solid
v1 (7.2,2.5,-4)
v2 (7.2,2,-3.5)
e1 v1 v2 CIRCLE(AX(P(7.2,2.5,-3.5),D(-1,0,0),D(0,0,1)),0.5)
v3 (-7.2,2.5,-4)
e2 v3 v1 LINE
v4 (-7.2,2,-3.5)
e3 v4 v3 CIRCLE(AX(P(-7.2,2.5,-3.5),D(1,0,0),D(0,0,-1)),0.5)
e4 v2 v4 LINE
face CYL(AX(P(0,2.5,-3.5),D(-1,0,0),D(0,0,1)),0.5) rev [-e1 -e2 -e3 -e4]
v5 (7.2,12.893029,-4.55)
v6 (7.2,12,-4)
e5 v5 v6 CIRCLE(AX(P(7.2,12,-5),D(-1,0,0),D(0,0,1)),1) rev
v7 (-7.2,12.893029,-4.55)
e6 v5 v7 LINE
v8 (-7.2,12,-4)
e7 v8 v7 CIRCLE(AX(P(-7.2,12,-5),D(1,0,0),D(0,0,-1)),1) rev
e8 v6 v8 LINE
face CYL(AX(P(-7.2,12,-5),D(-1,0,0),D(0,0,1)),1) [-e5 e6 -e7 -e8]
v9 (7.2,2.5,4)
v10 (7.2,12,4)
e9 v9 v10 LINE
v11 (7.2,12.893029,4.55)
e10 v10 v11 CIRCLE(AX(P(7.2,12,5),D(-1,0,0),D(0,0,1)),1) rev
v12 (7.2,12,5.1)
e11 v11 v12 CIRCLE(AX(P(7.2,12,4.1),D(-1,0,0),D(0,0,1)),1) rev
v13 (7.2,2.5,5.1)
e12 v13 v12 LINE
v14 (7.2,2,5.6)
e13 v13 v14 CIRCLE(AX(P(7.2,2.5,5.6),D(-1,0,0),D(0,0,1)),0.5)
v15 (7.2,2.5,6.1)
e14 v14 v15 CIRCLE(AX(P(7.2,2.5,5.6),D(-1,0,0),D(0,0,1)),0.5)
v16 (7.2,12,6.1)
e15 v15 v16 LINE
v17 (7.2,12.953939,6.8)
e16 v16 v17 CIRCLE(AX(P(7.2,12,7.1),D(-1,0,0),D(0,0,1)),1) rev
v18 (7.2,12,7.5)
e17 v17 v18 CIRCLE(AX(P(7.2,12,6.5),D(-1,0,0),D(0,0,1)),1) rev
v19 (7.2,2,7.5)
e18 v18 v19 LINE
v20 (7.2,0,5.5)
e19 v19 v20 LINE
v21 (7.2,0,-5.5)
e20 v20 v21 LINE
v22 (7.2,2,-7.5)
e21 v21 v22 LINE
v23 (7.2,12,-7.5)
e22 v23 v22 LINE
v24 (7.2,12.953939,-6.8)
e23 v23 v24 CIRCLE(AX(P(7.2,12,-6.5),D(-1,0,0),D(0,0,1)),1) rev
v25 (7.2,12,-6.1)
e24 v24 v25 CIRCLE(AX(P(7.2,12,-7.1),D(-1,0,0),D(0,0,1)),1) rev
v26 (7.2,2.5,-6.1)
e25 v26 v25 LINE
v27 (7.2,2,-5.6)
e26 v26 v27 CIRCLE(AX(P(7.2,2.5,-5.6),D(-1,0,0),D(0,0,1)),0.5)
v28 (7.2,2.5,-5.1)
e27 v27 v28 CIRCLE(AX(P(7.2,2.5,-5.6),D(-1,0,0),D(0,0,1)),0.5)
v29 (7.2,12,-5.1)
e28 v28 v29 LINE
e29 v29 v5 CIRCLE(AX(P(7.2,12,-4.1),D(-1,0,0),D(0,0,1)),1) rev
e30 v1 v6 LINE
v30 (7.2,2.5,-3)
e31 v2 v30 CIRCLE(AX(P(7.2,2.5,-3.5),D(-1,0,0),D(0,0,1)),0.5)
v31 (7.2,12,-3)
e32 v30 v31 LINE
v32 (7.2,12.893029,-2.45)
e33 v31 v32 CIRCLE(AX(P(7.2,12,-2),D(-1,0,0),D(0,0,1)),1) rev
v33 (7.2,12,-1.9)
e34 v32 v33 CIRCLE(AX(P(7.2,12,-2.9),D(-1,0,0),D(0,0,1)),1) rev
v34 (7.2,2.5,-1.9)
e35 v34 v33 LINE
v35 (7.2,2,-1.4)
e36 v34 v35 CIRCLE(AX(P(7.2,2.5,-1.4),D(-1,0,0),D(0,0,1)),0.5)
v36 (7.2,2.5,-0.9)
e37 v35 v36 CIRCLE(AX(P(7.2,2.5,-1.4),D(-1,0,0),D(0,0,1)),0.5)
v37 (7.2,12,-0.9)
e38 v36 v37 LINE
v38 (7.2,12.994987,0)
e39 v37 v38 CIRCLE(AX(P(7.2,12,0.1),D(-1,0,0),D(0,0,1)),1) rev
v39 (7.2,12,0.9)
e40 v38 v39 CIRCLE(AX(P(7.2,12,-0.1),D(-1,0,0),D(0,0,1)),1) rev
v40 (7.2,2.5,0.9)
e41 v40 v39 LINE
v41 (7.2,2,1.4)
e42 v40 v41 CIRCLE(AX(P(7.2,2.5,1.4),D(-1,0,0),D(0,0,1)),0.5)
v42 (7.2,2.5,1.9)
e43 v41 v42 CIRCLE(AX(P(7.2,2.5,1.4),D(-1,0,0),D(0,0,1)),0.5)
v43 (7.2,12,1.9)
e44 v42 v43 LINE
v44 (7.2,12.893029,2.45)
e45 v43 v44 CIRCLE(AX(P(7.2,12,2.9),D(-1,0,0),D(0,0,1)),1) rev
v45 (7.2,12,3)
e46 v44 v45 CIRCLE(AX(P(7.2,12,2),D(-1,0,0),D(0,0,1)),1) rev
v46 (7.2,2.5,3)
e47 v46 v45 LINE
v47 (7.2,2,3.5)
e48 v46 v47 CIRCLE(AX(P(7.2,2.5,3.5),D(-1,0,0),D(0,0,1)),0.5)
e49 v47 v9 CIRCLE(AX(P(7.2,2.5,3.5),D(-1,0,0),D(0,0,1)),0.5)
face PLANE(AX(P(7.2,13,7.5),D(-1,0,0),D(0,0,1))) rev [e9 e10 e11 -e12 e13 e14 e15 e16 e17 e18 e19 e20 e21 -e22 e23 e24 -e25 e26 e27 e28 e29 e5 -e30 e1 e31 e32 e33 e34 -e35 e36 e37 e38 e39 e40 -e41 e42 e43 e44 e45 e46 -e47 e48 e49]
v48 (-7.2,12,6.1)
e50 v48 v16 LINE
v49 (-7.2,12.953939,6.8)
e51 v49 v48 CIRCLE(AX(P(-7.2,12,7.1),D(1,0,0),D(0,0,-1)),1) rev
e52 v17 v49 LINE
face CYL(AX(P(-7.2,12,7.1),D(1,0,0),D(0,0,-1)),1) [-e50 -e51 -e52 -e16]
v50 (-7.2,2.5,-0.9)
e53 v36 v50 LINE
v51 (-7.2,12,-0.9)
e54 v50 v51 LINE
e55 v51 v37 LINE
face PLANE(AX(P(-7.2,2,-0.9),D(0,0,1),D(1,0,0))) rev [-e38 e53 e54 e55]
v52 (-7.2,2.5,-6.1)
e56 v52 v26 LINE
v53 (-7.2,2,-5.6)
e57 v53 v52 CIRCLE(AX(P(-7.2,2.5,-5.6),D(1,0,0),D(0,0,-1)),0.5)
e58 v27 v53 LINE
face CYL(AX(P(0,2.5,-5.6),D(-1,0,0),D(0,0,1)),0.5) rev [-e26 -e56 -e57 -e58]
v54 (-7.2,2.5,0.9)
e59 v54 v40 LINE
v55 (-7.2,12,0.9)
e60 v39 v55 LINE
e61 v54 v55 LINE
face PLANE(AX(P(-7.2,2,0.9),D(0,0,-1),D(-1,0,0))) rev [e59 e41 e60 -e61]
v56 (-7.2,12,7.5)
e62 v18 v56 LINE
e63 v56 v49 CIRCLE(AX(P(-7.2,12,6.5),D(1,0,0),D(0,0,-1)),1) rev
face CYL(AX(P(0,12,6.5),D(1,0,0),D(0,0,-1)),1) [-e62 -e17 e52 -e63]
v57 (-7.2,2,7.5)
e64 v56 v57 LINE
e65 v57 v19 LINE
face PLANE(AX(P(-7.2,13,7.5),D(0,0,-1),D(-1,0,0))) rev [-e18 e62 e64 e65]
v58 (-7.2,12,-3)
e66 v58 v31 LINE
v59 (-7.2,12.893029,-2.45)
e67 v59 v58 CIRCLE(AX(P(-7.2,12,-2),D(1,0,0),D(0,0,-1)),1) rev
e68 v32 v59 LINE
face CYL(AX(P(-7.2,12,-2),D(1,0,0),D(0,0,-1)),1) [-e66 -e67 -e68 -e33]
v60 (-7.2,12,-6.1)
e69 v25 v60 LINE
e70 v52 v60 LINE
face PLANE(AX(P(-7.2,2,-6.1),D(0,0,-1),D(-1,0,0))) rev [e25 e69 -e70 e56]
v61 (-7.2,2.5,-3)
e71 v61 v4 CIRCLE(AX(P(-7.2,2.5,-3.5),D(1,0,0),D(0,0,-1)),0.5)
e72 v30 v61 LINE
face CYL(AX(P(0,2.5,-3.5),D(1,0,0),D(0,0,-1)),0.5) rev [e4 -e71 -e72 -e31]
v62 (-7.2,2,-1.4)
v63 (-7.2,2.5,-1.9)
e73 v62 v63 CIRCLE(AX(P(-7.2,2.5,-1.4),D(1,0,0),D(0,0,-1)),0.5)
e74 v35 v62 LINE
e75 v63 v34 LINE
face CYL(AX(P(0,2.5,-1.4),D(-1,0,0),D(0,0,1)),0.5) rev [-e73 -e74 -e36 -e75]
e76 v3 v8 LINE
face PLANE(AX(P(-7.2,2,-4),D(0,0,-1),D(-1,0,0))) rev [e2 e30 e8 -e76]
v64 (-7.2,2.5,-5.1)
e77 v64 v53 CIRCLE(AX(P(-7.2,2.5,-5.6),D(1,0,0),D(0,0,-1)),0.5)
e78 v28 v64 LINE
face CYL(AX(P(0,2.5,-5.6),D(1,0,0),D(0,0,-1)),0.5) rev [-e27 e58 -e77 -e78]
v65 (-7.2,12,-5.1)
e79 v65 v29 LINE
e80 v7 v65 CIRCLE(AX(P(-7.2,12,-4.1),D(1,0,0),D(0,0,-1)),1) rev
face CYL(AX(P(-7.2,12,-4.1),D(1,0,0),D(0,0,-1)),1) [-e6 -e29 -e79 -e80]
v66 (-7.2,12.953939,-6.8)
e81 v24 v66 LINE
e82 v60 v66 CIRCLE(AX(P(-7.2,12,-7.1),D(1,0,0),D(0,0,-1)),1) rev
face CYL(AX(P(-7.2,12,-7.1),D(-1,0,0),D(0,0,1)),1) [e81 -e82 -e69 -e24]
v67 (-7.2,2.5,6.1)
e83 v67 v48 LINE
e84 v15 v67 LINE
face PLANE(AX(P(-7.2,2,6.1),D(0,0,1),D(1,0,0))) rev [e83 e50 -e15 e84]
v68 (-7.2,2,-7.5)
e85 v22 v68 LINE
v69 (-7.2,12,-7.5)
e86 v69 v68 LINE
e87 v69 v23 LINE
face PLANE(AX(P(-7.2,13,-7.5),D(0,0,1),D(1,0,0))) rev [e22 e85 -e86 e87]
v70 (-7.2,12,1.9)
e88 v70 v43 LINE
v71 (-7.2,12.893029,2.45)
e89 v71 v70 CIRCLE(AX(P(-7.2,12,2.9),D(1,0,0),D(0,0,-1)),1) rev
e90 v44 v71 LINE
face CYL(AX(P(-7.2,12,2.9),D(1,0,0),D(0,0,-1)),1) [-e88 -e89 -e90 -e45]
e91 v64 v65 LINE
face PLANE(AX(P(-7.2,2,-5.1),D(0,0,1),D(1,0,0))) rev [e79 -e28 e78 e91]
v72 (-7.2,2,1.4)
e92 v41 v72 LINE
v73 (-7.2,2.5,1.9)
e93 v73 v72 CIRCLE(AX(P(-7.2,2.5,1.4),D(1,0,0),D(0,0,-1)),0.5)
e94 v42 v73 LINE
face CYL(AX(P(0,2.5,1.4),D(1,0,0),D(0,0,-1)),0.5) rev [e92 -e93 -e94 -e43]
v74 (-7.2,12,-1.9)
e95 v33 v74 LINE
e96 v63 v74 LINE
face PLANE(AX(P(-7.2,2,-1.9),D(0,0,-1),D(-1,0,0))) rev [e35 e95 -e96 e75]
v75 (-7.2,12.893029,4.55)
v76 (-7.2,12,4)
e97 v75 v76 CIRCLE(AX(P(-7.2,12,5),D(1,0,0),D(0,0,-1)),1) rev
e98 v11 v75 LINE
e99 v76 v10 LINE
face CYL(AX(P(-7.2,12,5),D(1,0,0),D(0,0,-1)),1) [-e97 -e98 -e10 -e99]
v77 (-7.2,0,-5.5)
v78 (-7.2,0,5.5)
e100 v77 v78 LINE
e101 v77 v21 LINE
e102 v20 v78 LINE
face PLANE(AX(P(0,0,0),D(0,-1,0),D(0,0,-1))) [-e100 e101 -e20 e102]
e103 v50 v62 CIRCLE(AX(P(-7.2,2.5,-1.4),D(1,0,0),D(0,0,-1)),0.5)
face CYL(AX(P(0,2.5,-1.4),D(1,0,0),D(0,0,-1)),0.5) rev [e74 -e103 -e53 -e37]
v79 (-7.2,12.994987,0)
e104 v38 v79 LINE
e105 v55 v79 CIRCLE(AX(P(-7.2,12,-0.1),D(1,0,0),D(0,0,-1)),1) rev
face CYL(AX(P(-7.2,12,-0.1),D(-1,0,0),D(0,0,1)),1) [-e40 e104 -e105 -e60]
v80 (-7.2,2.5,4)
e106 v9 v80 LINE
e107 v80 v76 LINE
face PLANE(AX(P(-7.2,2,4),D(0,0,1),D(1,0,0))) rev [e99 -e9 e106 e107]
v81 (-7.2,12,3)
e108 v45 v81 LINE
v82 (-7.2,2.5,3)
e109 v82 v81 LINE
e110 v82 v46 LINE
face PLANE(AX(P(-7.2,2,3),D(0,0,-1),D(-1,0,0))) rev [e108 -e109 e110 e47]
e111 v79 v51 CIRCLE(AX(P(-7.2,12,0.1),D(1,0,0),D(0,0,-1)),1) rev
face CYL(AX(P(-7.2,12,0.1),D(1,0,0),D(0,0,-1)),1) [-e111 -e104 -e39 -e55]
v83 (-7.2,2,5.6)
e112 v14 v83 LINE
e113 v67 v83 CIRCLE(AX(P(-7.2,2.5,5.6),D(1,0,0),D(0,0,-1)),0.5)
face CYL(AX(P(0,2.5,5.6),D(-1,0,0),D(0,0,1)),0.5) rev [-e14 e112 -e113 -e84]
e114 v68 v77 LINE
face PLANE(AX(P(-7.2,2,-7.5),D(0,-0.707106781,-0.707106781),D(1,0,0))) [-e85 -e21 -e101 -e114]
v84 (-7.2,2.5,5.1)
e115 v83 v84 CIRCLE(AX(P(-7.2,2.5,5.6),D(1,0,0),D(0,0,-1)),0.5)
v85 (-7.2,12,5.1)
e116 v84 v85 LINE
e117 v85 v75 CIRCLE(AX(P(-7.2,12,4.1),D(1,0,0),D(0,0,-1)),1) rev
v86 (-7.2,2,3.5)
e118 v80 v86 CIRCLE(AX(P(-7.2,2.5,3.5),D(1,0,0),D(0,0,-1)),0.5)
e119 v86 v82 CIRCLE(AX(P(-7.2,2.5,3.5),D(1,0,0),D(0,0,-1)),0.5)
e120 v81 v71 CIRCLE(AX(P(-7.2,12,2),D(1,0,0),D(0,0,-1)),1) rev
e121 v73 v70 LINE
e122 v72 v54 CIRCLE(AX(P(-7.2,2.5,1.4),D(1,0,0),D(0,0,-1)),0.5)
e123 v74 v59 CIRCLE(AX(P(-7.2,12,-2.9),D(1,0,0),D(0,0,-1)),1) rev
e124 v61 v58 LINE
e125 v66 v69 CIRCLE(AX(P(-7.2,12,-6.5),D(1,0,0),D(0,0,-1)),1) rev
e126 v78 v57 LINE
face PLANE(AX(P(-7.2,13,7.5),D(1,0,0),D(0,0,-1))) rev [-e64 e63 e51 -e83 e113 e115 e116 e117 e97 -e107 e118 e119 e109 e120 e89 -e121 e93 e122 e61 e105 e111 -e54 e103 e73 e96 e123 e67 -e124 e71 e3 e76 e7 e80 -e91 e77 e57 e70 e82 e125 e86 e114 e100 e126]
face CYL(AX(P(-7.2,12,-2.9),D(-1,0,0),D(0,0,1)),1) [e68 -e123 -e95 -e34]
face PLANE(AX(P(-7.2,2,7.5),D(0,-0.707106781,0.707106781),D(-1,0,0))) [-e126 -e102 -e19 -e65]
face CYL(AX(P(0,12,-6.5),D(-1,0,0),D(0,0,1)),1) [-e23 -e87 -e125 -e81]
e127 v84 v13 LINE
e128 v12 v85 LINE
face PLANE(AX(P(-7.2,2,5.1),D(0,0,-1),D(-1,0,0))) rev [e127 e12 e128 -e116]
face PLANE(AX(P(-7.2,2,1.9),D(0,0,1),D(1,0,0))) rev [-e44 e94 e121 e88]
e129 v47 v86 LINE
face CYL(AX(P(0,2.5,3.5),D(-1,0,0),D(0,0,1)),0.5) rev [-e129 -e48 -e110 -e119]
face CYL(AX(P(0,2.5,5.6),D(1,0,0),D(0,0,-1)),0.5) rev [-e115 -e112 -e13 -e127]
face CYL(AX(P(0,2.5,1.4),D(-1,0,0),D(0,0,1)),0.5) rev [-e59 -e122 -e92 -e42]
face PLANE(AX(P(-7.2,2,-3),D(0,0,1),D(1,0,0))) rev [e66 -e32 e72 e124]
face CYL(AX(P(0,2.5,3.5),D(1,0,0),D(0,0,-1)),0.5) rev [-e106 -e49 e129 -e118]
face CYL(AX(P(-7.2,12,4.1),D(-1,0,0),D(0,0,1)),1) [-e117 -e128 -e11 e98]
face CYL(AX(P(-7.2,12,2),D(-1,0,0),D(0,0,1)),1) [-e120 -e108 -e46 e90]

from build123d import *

# Parameters (mm, degrees)
SKIZZE1_W                       = 14.4
SKIZZE1_H                       = 15
AUFSATZ_LINEAR_AUSTRAGEN1_DEPTH = 13
SKIZZE2_W                       = 14.4
SKIZZE2_H                       = 1
SCHNITT_LINEAR_AUSTRAGEN1_DEPTH = 11
VERRUNDUNG1_R                   = 1
FASE1_SIZE                      = 2
VERRUNDUNG3_R                   = 0.5


# Some blends are built 0.0001 mm under size
with BuildPart() as part:
    # Skizze1 → Aufsatz-Linear austragen1 (new body)
    with BuildSketch(Plane(origin=(0, 0, 0), x_dir=(1, 0, 0), z_dir=(0, 1, 0))):
        Rectangle(SKIZZE1_W, SKIZZE1_H)
    extrude(amount=AUFSATZ_LINEAR_AUSTRAGEN1_DEPTH)

    # Skizze2 → Schnitt-Linear austragen1 (cut)
    with BuildSketch(Plane(origin=(0, 13, 0), x_dir=(1, 0, 0), z_dir=(0, 1, 0))):
        with Locations((0, -5.6)):
            Rectangle(SKIZZE2_W, SKIZZE2_H)
        with Locations((0, -3.5)):
            Rectangle(SKIZZE2_W, SKIZZE2_H)
        with Locations((0, -1.4)):
            Rectangle(SKIZZE2_W, SKIZZE2_H)
        with Locations((0, 1.4)):
            Rectangle(SKIZZE2_W, SKIZZE2_H)
        with Locations((0, 3.5)):
            Rectangle(SKIZZE2_W, SKIZZE2_H)
        with Locations((0, 5.6)):
            Rectangle(SKIZZE2_W, SKIZZE2_H)
    extrude(amount=-SCHNITT_LINEAR_AUSTRAGEN1_DEPTH, mode=Mode.SUBTRACT)

    # Verrundung1
    # the kernel refuses this fillet: 1 mm, written as the material it takes off along each edge
    with BuildSketch(Plane(origin=(-9.7, 13, 7.5), x_dir=(0, -1, 0), z_dir=(1, 0, 0)), Plane(origin=(-9.7, 13, 6.1), x_dir=(0, 0, 1), z_dir=(1, 0, 0)), Plane(origin=(-9.7, 13, 3), x_dir=(0, -1, 0), z_dir=(1, 0, 0)), Plane(origin=(-9.7, 13, 0.9), x_dir=(0, -1, 0), z_dir=(1, 0, 0)), Plane(origin=(-9.7, 13, -1.9), x_dir=(0, -1, 0), z_dir=(1, 0, 0)), Plane(origin=(-9.7, 13, -4), x_dir=(0, -1, 0), z_dir=(1, 0, 0)), Plane(origin=(-9.7, 13, -6.1), x_dir=(0, -1, 0), z_dir=(1, 0, 0))) as verrundung1_piece_1:
        with BuildLine():
            CenterArc((VERRUNDUNG1_R, VERRUNDUNG1_R), VERRUNDUNG1_R, 180, 90)
            Line((0, VERRUNDUNG1_R), (0, 0))
            Line((0, 0), (VERRUNDUNG1_R, 0))
        make_face()
    extrude(amount=19.4, mode=Mode.SUBTRACT)
    with BuildSketch(Plane(origin=(9.7, 13, 5.1), x_dir=(0, -1, 0), z_dir=(-1, 0, 0)), Plane(origin=(9.7, 13, 4), x_dir=(0, 0, 1), z_dir=(-1, 0, 0)), Plane(origin=(9.7, 13, 1.9), x_dir=(0, 0, 1), z_dir=(-1, 0, 0)), Plane(origin=(9.7, 13, -0.9), x_dir=(0, 0, 1), z_dir=(-1, 0, 0)), Plane(origin=(9.7, 13, -3), x_dir=(0, 0, 1), z_dir=(-1, 0, 0)), Plane(origin=(9.7, 13, -5.1), x_dir=(0, 0, 1), z_dir=(-1, 0, 0)), Plane(origin=(9.7, 13, -7.5), x_dir=(0, 0, 1), z_dir=(-1, 0, 0))) as verrundung1_piece_2:
        with BuildLine():
            CenterArc((VERRUNDUNG1_R, -VERRUNDUNG1_R), VERRUNDUNG1_R, 90, 90)
            Line((0, -VERRUNDUNG1_R), (0, 0))
            Line((0, 0), (VERRUNDUNG1_R, 0))
        make_face()
    extrude(amount=19.4, mode=Mode.SUBTRACT)

    # Fase1
    fase1_edges = [part.edges().sort_by_distance(p)[0] for p in [
        (0, 0, 7.5),
        (0, 0, -7.5),
    ]]
    chamfer(fase1_edges, length=FASE1_SIZE)

    # Verrundung3
    verrundung3_edges = [part.edges().sort_by_distance(p)[0] for p in [
        (0, 2, -5.1),
        (0, 2, -3),
        (0, 2, -0.9),
        (0, 2, 1.9),
        (0, 2, 4),
        (0, 2, 6.1),
        (0, 2, 5.1),
        (0, 2, 3),
        (0, 2, 0.9),
        (0, 2, -1.9),
        (0, 2, -4),
        (0, 2, -6.1),
    ]]
    fillet(verrundung3_edges, radius=VERRUNDUNG3_R - 0.0001)  # a hair under: the kernel refuses the full size


solid = part.part
